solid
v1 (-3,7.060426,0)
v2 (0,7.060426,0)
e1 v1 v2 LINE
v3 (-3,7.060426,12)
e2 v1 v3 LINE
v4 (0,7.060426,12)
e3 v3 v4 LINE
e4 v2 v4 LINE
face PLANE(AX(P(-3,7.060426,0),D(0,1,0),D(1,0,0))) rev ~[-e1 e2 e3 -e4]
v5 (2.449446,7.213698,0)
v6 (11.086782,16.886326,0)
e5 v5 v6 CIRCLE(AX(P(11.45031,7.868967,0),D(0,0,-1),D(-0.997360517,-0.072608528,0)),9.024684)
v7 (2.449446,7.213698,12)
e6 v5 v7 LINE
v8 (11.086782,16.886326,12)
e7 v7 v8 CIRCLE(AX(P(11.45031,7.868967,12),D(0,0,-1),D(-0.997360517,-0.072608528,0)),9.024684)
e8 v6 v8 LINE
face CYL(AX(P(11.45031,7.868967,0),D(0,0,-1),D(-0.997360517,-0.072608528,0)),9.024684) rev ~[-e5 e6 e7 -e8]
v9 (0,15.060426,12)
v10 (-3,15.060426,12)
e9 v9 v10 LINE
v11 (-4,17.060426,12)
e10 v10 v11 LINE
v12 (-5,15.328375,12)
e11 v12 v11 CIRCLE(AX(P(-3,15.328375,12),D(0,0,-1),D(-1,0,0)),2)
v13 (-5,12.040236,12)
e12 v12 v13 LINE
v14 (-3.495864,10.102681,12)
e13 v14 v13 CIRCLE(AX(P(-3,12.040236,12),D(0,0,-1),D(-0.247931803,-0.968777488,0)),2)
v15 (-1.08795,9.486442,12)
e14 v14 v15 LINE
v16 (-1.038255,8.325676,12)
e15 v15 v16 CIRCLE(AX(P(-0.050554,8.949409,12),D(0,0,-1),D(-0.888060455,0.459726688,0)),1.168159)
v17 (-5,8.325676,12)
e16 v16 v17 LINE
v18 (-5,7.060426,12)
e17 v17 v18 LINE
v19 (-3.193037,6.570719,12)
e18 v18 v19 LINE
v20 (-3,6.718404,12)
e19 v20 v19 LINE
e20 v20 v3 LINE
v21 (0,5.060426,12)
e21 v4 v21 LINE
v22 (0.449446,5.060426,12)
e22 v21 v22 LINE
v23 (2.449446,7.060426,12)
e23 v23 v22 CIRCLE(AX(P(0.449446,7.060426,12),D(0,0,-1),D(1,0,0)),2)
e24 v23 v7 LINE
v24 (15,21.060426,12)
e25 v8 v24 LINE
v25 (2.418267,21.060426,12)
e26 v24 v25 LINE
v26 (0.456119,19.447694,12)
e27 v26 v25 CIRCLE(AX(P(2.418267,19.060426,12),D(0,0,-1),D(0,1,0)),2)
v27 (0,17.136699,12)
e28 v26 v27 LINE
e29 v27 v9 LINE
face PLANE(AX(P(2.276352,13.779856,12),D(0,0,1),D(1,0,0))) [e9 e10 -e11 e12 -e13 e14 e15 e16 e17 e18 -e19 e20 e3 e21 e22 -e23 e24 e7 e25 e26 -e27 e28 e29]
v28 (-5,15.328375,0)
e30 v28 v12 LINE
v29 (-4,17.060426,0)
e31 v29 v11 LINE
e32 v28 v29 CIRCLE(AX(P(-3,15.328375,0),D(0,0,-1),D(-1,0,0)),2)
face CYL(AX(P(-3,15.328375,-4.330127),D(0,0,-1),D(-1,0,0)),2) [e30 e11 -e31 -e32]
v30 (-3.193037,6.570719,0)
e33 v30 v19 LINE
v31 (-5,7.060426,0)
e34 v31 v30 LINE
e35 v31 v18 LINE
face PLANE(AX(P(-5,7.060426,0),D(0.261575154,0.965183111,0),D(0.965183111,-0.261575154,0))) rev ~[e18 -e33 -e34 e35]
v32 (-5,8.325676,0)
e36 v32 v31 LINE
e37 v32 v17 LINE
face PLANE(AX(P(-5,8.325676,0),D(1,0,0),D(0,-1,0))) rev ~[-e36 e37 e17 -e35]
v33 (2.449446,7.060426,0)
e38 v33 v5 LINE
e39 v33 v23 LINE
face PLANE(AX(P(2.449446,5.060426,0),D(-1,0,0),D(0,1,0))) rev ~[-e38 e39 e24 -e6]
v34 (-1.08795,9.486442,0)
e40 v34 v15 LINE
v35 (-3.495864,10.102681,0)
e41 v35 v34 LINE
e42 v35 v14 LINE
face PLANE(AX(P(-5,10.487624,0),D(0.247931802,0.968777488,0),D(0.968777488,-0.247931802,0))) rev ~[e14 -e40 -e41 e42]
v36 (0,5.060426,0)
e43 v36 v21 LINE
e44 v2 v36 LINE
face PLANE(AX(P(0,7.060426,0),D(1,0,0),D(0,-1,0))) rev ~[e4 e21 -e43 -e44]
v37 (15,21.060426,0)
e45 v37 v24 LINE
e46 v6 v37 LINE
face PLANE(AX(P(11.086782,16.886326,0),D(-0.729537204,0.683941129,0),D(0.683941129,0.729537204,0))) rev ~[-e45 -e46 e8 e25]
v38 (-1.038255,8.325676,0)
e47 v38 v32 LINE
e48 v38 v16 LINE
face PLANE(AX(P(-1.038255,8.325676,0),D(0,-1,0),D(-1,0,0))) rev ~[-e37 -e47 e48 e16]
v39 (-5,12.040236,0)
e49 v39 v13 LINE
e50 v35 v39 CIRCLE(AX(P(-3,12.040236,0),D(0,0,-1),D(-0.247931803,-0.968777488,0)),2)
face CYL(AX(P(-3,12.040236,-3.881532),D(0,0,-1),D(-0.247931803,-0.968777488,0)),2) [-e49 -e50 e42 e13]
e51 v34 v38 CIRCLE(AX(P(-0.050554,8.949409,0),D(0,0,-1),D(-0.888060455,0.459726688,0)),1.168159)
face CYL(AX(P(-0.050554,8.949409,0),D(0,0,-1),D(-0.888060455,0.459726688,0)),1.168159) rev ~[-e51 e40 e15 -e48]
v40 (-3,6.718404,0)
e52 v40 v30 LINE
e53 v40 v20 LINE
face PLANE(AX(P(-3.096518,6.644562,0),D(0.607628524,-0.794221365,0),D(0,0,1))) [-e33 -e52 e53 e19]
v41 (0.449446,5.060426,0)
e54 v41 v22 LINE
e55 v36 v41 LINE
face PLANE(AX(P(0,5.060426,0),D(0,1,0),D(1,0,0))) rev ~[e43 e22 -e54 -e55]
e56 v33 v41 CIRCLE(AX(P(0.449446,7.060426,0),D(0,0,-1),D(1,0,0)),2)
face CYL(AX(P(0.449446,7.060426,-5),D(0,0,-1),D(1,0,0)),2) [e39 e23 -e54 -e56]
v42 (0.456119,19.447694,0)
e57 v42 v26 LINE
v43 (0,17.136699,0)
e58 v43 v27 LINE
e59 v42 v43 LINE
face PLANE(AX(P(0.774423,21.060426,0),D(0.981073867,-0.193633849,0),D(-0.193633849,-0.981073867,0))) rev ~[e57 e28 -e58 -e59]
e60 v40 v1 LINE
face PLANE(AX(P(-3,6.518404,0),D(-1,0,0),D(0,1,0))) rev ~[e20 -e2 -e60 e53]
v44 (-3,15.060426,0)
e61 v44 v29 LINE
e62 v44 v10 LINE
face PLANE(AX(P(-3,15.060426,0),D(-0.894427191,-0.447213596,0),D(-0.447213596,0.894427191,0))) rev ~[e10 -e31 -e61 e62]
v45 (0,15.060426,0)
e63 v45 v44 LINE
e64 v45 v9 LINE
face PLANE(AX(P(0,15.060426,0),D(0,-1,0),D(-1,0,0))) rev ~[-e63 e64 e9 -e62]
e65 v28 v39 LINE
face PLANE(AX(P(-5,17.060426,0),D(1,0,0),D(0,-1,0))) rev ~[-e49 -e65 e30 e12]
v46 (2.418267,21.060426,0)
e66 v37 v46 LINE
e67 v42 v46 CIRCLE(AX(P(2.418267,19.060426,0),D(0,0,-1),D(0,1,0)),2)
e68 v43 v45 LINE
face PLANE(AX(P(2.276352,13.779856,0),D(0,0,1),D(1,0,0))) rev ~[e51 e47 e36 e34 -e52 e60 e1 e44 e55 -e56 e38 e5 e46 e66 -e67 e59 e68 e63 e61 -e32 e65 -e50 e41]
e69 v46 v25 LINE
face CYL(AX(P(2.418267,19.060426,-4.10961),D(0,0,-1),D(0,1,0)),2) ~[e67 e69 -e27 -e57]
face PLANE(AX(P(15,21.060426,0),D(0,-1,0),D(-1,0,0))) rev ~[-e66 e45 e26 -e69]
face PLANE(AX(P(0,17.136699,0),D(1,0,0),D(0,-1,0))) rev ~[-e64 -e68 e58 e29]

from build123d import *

# Parameters (mm, degrees)
F1_DEPTH    = 12
F2_T1_DEPTH = 22
F2_T3_DEPTH = 20.6602540378
F2_T5_DEPTH = 20.219219555
F2_T7_DEPTH = 19.7630643448
F3_SIZE     = 0.2


# Not quite as in the source:
# - a fillet or chamfer that OpenCascade refuses, or shapes differently, is made with other operations: its cross-section is extruded or revolved along the edge and cut away or added


with BuildPart() as f1:
    # F0 (on Top) → F1 (new body)
    with BuildSketch(Plane.XY):
        with BuildLine():
            Line((0, 17.1366985887), (0, 15.0604258217))
            Line((0, 15.0604258217), (-3, 15.0604258217))
            Line((-3, 15.0604258217), (-4, 17.0604258217))
            Line((-4, 17.0604258217), (-5, 17.0604258217))
            Line((-5, 17.0604258217), (-5, 10.4876235127))
            Line((-5, 10.4876235127), (-1.0879496576, 9.4864424318))
            ThreePointArc((-1.0879496576, 9.4864424318), (1.1165361393, 8.9993738808), (-1.0382550692, 8.3256764337))
            Line((-1.0382550692, 8.3256764337), (-5, 8.3256764337))
            Line((-5, 8.3256764337), (-5, 7.6356520876))
            Line((-5, 7.6356520876), (-5, 7.0604258217))
            Line((-5, 7.0604258217), (-3, 6.5184039995))
            Line((-3, 6.5184039995), (-3, 7.0604258217))
            Line((-3, 7.0604258217), (0, 7.0604258217))
            Line((0, 7.0604258217), (0, 5.0604258217))
            Line((0, 5.0604258217), (2.4494461788, 5.0604258217))
            Line((2.4494461788, 5.0604258217), (2.4494461788, 7.2136978708))
            ThreePointArc((2.4494461788, 7.2136978708), (4.7188246076, 13.8799594264), (11.0867818181, 16.8863264277))
            Line((11.0867818181, 16.8863264277), (15, 21.0604258217))
            Line((15, 21.0604258217), (2.1266145632, 21.0604258217))
            Line((2.1266145632, 21.0604258217), (0.7744232425, 21.0604258217))
            Line((0.7744232425, 21.0604258217), (0, 17.1366985887))
        make_face()
    extrude(amount=F1_DEPTH)

    # F2: fillet of radius 2 on 4 edges, made by hand

    # F2_s2 → F2_t1 (cut)
    with BuildSketch(Plane.XY.offset(-5)):
        with BuildLine():
            ThreePointArc((2.4494461788, 7.0604258217), (1.8636597412, 5.6462122593), (0.4494461788, 5.0604258217))
            Line((0.4494461788, 5.0604258217), (2.4494461788, 5.0604258217))
            Line((2.4494461788, 5.0604258217), (2.4494461788, 7.0604258217))
        make_face()
    extrude(amount=F2_T1_DEPTH, mode=Mode.SUBTRACT)

    # F2_s4 → F2_t3 (cut)
    with BuildSketch(Plane.XY.offset(-4.3301270189)):
        with BuildLine():
            ThreePointArc((-5, 15.3283750141), (-4.7320508076, 16.3283750141), (-4, 17.0604258217))
            Line((-4, 17.0604258217), (-5, 17.0604258217))
            Line((-5, 17.0604258217), (-5, 15.3283750141))
        make_face()
    extrude(amount=F2_T3_DEPTH, mode=Mode.SUBTRACT)

    # F2_s6 → F2_t5 (cut)
    with BuildSketch(Plane.XY.offset(-4.1096097775)):
        with BuildLine():
            ThreePointArc((2.4182671536, 21.0604258217), (1.1483331779, 20.6055043625), (0.4561194194, 19.4476935191))
            Line((0.4561194194, 19.4476935191), (0.7744232425, 21.0604258217))
            Line((0.7744232425, 21.0604258217), (2.4182671536, 21.0604258217))
        make_face()
    extrude(amount=F2_T5_DEPTH, mode=Mode.SUBTRACT)

    # F2_s8 → F2_t7 (cut)
    with BuildSketch(Plane.XY.offset(-3.8815321724)):
        with BuildLine():
            ThreePointArc((-3.4958636049, 10.1026814056), (-4.5798302456, 10.8138039967), (-5, 12.0402363817))
            Line((-5, 12.0402363817), (-5, 10.4876235127))
            Line((-5, 10.4876235127), (-3.4958636049, 10.1026814056))
        make_face()
    extrude(amount=F2_T7_DEPTH, mode=Mode.SUBTRACT)

    # F3
    f3_edges = [f1.edges().sort_by_distance(p)[0] for p in [
        (-3, 6.518404, 6),
    ]]
    chamfer(f3_edges, length=F3_SIZE)


solid = f1.part
